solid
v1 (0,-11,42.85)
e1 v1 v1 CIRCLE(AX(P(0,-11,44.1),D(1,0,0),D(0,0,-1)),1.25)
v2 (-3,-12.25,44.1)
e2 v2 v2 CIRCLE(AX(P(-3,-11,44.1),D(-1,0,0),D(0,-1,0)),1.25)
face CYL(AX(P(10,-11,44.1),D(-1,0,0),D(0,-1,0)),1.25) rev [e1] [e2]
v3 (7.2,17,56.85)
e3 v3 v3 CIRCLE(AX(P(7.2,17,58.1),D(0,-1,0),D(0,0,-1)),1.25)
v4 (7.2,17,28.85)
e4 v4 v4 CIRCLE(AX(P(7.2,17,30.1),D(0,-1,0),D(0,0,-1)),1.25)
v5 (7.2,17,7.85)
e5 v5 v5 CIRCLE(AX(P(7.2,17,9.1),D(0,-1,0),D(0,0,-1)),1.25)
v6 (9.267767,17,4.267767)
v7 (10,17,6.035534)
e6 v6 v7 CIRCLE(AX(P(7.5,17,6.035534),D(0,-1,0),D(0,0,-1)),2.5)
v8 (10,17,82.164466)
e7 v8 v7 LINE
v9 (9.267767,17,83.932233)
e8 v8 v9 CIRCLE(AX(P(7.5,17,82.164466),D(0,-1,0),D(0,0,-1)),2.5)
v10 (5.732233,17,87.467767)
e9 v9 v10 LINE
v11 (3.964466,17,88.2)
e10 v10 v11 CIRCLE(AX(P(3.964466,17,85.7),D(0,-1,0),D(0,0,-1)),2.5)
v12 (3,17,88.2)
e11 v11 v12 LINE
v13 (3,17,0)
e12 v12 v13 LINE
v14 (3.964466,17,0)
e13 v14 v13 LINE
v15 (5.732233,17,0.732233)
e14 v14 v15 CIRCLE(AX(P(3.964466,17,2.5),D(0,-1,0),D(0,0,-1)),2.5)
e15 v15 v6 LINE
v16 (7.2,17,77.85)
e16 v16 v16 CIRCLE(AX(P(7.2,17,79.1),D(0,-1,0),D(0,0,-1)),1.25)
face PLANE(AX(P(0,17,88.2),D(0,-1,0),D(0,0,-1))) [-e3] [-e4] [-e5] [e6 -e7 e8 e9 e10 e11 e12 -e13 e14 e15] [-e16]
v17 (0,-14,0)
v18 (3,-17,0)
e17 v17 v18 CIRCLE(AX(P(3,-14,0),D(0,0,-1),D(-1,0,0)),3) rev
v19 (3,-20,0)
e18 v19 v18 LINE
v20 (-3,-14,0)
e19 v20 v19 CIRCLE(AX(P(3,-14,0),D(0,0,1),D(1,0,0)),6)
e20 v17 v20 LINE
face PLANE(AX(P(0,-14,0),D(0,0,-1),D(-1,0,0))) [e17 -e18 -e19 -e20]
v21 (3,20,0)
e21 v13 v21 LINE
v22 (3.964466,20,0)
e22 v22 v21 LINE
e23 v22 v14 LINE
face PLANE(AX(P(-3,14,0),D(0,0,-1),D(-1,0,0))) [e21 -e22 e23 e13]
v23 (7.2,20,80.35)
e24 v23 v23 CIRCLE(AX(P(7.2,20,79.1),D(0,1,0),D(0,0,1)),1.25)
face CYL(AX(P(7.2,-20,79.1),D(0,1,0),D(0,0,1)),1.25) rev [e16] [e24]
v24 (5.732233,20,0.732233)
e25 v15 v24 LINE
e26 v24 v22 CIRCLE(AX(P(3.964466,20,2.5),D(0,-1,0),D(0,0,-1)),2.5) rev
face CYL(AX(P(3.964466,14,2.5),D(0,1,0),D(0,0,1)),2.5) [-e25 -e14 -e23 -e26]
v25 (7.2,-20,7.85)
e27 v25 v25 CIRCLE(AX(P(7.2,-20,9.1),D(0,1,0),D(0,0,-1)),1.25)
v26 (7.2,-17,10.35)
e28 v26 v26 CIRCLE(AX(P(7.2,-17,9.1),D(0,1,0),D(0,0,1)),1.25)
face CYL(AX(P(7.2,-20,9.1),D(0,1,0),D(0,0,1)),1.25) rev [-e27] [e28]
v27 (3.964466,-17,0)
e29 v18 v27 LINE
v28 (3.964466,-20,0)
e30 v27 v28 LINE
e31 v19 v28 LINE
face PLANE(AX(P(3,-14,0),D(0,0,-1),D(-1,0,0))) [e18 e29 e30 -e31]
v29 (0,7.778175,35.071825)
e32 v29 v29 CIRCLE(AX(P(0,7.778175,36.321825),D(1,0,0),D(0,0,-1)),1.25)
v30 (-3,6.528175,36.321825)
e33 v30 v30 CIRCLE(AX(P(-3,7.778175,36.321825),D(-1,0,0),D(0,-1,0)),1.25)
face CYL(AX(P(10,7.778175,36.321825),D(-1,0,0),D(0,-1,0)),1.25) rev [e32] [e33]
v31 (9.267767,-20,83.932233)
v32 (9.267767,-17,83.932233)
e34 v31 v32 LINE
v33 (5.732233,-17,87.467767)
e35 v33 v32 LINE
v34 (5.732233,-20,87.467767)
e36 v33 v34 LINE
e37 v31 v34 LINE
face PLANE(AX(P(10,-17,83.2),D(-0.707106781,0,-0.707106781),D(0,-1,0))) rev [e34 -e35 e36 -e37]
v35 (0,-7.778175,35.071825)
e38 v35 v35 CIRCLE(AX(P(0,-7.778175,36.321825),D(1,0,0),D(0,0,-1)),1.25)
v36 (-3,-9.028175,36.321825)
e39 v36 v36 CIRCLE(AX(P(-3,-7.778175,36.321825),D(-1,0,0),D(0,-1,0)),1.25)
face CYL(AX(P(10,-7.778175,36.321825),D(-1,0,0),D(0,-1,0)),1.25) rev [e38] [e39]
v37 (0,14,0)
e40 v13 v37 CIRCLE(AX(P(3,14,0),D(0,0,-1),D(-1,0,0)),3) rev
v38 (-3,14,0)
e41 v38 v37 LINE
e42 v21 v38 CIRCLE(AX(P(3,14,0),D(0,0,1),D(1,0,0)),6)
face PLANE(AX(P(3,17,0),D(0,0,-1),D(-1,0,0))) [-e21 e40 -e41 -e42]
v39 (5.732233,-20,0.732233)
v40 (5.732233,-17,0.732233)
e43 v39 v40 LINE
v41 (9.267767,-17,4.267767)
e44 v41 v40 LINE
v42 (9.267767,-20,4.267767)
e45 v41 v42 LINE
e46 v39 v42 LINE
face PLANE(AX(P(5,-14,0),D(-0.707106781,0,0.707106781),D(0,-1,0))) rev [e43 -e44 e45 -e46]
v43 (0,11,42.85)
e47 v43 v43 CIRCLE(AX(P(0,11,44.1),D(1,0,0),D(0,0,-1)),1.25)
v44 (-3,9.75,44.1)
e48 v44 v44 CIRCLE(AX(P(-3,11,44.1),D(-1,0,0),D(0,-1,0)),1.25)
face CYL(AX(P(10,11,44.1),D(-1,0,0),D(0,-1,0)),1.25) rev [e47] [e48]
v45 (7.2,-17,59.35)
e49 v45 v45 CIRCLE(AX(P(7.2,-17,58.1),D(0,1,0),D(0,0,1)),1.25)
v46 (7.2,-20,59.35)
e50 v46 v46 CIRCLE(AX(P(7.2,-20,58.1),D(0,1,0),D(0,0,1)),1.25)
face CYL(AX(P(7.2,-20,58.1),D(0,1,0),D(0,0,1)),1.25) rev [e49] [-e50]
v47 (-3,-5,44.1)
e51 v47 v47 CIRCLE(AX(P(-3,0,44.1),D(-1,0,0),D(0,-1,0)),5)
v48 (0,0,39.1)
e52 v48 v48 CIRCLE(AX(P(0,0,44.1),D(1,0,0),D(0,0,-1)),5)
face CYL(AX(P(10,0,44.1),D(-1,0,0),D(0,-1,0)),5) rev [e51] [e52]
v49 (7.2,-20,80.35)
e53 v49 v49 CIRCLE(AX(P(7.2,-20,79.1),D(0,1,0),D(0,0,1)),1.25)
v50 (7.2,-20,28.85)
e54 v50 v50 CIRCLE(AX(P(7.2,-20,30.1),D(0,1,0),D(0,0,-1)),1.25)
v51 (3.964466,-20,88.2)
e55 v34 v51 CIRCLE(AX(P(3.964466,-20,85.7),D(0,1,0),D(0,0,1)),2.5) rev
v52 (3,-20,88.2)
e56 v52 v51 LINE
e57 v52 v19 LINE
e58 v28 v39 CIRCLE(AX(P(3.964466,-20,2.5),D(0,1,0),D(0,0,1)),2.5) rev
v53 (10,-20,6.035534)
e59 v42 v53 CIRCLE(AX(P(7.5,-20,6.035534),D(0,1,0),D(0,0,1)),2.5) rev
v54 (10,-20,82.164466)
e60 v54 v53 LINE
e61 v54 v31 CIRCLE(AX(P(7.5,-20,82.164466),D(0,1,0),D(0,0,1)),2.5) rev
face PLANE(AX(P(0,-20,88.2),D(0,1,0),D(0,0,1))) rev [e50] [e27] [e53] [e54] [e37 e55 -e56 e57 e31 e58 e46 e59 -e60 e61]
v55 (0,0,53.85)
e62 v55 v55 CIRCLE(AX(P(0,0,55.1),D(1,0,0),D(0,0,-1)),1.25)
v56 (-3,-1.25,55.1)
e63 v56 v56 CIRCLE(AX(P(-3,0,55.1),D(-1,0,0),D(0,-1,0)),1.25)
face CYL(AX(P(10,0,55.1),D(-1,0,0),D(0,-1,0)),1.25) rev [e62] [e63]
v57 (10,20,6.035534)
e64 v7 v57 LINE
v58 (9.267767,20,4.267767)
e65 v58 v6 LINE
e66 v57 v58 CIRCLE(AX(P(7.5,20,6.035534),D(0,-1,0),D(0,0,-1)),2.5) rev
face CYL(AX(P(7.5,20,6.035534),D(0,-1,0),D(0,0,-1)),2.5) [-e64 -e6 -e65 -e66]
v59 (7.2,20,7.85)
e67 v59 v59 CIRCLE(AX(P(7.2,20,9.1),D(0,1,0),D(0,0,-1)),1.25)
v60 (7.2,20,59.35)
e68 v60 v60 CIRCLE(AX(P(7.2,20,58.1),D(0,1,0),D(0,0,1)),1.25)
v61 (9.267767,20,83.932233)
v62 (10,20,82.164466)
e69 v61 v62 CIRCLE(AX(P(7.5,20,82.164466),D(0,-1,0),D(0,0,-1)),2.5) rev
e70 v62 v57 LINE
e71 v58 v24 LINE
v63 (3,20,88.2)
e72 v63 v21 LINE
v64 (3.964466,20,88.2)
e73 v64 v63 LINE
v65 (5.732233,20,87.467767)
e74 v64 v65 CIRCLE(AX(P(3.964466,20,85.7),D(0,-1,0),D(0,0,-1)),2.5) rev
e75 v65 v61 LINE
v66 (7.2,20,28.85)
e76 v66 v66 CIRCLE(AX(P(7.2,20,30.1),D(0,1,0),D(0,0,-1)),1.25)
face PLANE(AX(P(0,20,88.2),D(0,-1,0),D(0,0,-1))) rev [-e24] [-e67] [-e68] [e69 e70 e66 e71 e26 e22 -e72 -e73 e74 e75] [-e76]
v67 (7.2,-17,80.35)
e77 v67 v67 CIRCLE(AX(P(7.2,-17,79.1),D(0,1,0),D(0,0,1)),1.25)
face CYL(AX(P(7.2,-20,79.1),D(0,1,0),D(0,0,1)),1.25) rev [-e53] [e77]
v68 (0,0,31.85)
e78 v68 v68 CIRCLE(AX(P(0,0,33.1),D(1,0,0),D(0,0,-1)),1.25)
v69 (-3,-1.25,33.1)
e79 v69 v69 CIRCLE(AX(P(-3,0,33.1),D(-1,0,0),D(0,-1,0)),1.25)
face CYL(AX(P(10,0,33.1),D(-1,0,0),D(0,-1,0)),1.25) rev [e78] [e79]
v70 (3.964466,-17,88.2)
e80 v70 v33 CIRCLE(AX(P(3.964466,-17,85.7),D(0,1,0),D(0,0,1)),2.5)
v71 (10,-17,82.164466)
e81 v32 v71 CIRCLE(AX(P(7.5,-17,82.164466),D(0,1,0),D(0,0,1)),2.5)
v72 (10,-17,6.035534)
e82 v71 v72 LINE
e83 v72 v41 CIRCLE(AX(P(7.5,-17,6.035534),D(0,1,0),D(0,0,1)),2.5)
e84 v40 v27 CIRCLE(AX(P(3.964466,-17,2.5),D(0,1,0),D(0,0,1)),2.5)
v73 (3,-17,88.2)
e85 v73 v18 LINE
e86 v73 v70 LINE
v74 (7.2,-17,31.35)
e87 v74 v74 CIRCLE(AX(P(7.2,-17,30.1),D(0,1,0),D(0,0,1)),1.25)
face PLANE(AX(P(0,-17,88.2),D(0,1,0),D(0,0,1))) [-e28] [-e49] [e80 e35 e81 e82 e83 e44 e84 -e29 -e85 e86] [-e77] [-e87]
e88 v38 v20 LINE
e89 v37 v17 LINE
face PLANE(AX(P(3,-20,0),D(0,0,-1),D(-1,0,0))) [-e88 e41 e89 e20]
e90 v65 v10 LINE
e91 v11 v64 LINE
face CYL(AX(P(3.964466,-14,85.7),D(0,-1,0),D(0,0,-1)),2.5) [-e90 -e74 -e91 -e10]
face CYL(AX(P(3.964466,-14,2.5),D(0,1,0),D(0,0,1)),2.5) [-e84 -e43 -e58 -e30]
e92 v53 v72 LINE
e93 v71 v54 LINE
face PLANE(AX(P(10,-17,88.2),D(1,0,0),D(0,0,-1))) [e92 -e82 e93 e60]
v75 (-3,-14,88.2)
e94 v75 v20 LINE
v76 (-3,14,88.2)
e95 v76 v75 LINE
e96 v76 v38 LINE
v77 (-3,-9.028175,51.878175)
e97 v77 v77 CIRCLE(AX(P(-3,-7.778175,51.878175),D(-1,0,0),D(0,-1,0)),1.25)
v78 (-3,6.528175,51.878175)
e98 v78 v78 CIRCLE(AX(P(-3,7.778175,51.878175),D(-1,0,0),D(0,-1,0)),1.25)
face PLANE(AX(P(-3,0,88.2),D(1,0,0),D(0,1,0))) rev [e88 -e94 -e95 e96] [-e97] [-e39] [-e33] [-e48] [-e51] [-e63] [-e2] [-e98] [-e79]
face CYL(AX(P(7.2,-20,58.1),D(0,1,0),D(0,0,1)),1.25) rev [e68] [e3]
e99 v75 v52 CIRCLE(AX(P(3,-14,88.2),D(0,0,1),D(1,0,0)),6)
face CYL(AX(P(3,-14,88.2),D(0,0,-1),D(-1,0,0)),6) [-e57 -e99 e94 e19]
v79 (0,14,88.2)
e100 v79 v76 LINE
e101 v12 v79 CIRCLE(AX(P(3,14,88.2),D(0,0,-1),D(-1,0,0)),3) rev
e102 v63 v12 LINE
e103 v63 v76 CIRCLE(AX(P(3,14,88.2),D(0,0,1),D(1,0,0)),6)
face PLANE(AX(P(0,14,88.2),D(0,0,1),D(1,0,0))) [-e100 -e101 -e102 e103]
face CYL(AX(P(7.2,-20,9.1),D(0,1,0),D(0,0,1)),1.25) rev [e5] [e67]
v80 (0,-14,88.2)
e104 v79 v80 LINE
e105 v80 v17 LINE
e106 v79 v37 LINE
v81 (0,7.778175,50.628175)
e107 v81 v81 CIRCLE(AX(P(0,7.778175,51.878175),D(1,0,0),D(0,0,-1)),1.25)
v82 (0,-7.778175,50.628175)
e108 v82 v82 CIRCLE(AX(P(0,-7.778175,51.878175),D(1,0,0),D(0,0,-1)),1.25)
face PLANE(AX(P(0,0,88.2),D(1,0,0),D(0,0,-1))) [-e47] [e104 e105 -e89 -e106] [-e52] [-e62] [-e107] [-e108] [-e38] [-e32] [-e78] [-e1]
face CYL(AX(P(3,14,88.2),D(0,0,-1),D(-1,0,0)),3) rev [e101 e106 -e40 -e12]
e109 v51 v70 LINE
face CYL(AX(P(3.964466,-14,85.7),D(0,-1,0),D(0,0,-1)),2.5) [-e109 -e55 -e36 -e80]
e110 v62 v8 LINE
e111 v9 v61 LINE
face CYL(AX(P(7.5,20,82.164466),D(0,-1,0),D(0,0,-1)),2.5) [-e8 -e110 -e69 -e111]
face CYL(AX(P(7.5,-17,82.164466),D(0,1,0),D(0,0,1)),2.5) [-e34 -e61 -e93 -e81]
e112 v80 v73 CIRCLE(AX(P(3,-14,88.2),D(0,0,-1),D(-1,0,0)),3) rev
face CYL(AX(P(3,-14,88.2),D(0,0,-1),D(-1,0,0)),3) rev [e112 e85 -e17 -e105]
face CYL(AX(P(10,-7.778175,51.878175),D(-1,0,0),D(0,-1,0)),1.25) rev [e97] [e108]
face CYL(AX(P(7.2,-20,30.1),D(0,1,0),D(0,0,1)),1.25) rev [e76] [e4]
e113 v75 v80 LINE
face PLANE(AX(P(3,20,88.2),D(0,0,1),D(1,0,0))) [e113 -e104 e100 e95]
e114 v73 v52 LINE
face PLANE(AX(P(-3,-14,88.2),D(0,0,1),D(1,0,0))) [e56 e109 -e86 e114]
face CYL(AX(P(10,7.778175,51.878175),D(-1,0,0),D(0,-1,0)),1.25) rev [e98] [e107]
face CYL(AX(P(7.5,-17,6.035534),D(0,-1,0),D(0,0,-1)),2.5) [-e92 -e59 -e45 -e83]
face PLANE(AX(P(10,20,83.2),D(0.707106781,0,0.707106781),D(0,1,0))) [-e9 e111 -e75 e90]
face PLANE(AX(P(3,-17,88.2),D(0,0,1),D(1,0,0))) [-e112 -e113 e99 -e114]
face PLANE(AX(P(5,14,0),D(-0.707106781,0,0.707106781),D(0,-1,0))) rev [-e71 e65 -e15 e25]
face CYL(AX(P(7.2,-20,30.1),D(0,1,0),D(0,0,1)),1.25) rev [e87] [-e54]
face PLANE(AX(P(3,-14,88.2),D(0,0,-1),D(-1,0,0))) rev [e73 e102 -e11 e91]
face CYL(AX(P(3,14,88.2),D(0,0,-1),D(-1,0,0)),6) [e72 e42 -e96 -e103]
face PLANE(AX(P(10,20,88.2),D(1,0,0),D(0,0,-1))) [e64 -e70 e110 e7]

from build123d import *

# Parameters (mm, degrees)
BASE_FLANGE1_DEPTH = 88.2
CHAMFER1_SIZE      = 5
FILLET1_R          = 2.5
SKETCH4_R          = 5
CUT_EXTRUDE1_DEPTH = 92.368703613
SKETCH5_R          = 1.25
CUT_EXTRUDE2_DEPTH = 92.368703613
SKETCH6_R          = 1.25
CUT_EXTRUDE3_DEPTH = 98.361388651


# Sheet-metal steps are written as plain solids
with BuildPart() as part:
    # Sketch1 → Base-Flange1 (new body)
    with BuildSketch(Plane.XY):
        with BuildLine():
            Line((10, -17), (3, -17))
            ThreePointArc((3, -17), (0.878679656, -16.121320344), (0, -14))
            Line((0, -14), (0, 0))
            Line((0, 0), (0, 14))
            ThreePointArc((0, 14), (0.878679656, 16.121320344), (3, 17))
            Line((3, 17), (10, 17))
            Line((10, 17), (10, 20))
            Line((10, 20), (3, 20))
            ThreePointArc((3, 20), (-1.242640687, 18.242640687), (-3, 14))
            Line((-3, 14), (-3, 0))
            Line((-3, 0), (-3, -14))
            ThreePointArc((-3, -14), (-1.242640687, -18.242640687), (3, -20))
            Line((3, -20), (10, -20))
            Line((10, -20), (10, -17))
        make_face()
    extrude(amount=BASE_FLANGE1_DEPTH)

    # Chamfer1
    chamfer1_edges = [part.edges().sort_by_distance(p)[0] for p in [
        (10, 18.5, 0),
        (10, -18.5, 0),
        (10, 18.5, 88.2),
        (10, -18.5, 88.2),
    ]]
    chamfer(chamfer1_edges, length=CHAMFER1_SIZE)

    # Fillet1
    fillet1_edges = [part.edges().sort_by_distance(p)[0] for p in [
        (5, -18.5, 0),
        (10, -18.5, 83.2),
        (10, -18.5, 5),
        (5, 18.5, 0),
        (10, 18.5, 83.2),
        (10, 18.5, 5),
        (5, -18.5, 88.2),
        (5, 18.5, 88.2),
    ]]
    fillet(fillet1_edges, radius=FILLET1_R)

    # Sketch4 → Cut-Extrude1 (cut, through all)
    with BuildSketch(Plane.ZY.offset(3)):
        with Locations(Location((44.1, 0, 0), (0, 0, 270))):
            Circle(SKETCH4_R)
    extrude(amount=-CUT_EXTRUDE1_DEPTH, mode=Mode.SUBTRACT)

    # Sketch5 → Cut-Extrude2 (cut, through all)
    with BuildSketch(Plane.ZY.offset(3)):
        with Locations(Location((44.1, 11, 0), (0, 0, 270))):
            Circle(SKETCH5_R)
        with Locations(Location((51.878174593, 7.778174593, 0), (0, 0, 270))):
            Circle(SKETCH5_R)
        with Locations(Location((55.1, 0, 0), (0, 0, 270))):
            Circle(SKETCH5_R)
        with Locations(Location((51.878174593, -7.778174593, 0), (0, 0, 270))):
            Circle(SKETCH5_R)
        with Locations(Location((44.1, -11, 0), (0, 0, 270))):
            Circle(SKETCH5_R)
        with Locations(Location((36.321825407, -7.778174593, 0), (0, 0, 270))):
            Circle(SKETCH5_R)
        with Locations(Location((33.1, 0, 0), (0, 0, 270))):
            Circle(SKETCH5_R)
        with Locations(Location((36.321825407, 7.778174593, 0), (0, 0, 270))):
            Circle(SKETCH5_R)
    extrude(amount=-CUT_EXTRUDE2_DEPTH, mode=Mode.SUBTRACT)

    # Sketch6 → Cut-Extrude3 (cut, through all)
    with BuildSketch(Plane(origin=(0, 20, 0), x_dir=(1, 0, 0), z_dir=(0, 1, 0))):
        with Locations(Location((7.2, -79.1, 0), (0, 0, 270))):
            Circle(SKETCH6_R)
        with Locations(Location((7.2, -58.1, 0), (0, 0, 270))):
            Circle(SKETCH6_R)
        with Locations(Location((7.2, -30.1, 0), (0, 0, 90))):
            Circle(SKETCH6_R)
        with Locations(Location((7.2, -9.1, 0), (0, 0, 90))):
            Circle(SKETCH6_R)
    extrude(amount=-CUT_EXTRUDE3_DEPTH, mode=Mode.SUBTRACT)


solid = part.part
